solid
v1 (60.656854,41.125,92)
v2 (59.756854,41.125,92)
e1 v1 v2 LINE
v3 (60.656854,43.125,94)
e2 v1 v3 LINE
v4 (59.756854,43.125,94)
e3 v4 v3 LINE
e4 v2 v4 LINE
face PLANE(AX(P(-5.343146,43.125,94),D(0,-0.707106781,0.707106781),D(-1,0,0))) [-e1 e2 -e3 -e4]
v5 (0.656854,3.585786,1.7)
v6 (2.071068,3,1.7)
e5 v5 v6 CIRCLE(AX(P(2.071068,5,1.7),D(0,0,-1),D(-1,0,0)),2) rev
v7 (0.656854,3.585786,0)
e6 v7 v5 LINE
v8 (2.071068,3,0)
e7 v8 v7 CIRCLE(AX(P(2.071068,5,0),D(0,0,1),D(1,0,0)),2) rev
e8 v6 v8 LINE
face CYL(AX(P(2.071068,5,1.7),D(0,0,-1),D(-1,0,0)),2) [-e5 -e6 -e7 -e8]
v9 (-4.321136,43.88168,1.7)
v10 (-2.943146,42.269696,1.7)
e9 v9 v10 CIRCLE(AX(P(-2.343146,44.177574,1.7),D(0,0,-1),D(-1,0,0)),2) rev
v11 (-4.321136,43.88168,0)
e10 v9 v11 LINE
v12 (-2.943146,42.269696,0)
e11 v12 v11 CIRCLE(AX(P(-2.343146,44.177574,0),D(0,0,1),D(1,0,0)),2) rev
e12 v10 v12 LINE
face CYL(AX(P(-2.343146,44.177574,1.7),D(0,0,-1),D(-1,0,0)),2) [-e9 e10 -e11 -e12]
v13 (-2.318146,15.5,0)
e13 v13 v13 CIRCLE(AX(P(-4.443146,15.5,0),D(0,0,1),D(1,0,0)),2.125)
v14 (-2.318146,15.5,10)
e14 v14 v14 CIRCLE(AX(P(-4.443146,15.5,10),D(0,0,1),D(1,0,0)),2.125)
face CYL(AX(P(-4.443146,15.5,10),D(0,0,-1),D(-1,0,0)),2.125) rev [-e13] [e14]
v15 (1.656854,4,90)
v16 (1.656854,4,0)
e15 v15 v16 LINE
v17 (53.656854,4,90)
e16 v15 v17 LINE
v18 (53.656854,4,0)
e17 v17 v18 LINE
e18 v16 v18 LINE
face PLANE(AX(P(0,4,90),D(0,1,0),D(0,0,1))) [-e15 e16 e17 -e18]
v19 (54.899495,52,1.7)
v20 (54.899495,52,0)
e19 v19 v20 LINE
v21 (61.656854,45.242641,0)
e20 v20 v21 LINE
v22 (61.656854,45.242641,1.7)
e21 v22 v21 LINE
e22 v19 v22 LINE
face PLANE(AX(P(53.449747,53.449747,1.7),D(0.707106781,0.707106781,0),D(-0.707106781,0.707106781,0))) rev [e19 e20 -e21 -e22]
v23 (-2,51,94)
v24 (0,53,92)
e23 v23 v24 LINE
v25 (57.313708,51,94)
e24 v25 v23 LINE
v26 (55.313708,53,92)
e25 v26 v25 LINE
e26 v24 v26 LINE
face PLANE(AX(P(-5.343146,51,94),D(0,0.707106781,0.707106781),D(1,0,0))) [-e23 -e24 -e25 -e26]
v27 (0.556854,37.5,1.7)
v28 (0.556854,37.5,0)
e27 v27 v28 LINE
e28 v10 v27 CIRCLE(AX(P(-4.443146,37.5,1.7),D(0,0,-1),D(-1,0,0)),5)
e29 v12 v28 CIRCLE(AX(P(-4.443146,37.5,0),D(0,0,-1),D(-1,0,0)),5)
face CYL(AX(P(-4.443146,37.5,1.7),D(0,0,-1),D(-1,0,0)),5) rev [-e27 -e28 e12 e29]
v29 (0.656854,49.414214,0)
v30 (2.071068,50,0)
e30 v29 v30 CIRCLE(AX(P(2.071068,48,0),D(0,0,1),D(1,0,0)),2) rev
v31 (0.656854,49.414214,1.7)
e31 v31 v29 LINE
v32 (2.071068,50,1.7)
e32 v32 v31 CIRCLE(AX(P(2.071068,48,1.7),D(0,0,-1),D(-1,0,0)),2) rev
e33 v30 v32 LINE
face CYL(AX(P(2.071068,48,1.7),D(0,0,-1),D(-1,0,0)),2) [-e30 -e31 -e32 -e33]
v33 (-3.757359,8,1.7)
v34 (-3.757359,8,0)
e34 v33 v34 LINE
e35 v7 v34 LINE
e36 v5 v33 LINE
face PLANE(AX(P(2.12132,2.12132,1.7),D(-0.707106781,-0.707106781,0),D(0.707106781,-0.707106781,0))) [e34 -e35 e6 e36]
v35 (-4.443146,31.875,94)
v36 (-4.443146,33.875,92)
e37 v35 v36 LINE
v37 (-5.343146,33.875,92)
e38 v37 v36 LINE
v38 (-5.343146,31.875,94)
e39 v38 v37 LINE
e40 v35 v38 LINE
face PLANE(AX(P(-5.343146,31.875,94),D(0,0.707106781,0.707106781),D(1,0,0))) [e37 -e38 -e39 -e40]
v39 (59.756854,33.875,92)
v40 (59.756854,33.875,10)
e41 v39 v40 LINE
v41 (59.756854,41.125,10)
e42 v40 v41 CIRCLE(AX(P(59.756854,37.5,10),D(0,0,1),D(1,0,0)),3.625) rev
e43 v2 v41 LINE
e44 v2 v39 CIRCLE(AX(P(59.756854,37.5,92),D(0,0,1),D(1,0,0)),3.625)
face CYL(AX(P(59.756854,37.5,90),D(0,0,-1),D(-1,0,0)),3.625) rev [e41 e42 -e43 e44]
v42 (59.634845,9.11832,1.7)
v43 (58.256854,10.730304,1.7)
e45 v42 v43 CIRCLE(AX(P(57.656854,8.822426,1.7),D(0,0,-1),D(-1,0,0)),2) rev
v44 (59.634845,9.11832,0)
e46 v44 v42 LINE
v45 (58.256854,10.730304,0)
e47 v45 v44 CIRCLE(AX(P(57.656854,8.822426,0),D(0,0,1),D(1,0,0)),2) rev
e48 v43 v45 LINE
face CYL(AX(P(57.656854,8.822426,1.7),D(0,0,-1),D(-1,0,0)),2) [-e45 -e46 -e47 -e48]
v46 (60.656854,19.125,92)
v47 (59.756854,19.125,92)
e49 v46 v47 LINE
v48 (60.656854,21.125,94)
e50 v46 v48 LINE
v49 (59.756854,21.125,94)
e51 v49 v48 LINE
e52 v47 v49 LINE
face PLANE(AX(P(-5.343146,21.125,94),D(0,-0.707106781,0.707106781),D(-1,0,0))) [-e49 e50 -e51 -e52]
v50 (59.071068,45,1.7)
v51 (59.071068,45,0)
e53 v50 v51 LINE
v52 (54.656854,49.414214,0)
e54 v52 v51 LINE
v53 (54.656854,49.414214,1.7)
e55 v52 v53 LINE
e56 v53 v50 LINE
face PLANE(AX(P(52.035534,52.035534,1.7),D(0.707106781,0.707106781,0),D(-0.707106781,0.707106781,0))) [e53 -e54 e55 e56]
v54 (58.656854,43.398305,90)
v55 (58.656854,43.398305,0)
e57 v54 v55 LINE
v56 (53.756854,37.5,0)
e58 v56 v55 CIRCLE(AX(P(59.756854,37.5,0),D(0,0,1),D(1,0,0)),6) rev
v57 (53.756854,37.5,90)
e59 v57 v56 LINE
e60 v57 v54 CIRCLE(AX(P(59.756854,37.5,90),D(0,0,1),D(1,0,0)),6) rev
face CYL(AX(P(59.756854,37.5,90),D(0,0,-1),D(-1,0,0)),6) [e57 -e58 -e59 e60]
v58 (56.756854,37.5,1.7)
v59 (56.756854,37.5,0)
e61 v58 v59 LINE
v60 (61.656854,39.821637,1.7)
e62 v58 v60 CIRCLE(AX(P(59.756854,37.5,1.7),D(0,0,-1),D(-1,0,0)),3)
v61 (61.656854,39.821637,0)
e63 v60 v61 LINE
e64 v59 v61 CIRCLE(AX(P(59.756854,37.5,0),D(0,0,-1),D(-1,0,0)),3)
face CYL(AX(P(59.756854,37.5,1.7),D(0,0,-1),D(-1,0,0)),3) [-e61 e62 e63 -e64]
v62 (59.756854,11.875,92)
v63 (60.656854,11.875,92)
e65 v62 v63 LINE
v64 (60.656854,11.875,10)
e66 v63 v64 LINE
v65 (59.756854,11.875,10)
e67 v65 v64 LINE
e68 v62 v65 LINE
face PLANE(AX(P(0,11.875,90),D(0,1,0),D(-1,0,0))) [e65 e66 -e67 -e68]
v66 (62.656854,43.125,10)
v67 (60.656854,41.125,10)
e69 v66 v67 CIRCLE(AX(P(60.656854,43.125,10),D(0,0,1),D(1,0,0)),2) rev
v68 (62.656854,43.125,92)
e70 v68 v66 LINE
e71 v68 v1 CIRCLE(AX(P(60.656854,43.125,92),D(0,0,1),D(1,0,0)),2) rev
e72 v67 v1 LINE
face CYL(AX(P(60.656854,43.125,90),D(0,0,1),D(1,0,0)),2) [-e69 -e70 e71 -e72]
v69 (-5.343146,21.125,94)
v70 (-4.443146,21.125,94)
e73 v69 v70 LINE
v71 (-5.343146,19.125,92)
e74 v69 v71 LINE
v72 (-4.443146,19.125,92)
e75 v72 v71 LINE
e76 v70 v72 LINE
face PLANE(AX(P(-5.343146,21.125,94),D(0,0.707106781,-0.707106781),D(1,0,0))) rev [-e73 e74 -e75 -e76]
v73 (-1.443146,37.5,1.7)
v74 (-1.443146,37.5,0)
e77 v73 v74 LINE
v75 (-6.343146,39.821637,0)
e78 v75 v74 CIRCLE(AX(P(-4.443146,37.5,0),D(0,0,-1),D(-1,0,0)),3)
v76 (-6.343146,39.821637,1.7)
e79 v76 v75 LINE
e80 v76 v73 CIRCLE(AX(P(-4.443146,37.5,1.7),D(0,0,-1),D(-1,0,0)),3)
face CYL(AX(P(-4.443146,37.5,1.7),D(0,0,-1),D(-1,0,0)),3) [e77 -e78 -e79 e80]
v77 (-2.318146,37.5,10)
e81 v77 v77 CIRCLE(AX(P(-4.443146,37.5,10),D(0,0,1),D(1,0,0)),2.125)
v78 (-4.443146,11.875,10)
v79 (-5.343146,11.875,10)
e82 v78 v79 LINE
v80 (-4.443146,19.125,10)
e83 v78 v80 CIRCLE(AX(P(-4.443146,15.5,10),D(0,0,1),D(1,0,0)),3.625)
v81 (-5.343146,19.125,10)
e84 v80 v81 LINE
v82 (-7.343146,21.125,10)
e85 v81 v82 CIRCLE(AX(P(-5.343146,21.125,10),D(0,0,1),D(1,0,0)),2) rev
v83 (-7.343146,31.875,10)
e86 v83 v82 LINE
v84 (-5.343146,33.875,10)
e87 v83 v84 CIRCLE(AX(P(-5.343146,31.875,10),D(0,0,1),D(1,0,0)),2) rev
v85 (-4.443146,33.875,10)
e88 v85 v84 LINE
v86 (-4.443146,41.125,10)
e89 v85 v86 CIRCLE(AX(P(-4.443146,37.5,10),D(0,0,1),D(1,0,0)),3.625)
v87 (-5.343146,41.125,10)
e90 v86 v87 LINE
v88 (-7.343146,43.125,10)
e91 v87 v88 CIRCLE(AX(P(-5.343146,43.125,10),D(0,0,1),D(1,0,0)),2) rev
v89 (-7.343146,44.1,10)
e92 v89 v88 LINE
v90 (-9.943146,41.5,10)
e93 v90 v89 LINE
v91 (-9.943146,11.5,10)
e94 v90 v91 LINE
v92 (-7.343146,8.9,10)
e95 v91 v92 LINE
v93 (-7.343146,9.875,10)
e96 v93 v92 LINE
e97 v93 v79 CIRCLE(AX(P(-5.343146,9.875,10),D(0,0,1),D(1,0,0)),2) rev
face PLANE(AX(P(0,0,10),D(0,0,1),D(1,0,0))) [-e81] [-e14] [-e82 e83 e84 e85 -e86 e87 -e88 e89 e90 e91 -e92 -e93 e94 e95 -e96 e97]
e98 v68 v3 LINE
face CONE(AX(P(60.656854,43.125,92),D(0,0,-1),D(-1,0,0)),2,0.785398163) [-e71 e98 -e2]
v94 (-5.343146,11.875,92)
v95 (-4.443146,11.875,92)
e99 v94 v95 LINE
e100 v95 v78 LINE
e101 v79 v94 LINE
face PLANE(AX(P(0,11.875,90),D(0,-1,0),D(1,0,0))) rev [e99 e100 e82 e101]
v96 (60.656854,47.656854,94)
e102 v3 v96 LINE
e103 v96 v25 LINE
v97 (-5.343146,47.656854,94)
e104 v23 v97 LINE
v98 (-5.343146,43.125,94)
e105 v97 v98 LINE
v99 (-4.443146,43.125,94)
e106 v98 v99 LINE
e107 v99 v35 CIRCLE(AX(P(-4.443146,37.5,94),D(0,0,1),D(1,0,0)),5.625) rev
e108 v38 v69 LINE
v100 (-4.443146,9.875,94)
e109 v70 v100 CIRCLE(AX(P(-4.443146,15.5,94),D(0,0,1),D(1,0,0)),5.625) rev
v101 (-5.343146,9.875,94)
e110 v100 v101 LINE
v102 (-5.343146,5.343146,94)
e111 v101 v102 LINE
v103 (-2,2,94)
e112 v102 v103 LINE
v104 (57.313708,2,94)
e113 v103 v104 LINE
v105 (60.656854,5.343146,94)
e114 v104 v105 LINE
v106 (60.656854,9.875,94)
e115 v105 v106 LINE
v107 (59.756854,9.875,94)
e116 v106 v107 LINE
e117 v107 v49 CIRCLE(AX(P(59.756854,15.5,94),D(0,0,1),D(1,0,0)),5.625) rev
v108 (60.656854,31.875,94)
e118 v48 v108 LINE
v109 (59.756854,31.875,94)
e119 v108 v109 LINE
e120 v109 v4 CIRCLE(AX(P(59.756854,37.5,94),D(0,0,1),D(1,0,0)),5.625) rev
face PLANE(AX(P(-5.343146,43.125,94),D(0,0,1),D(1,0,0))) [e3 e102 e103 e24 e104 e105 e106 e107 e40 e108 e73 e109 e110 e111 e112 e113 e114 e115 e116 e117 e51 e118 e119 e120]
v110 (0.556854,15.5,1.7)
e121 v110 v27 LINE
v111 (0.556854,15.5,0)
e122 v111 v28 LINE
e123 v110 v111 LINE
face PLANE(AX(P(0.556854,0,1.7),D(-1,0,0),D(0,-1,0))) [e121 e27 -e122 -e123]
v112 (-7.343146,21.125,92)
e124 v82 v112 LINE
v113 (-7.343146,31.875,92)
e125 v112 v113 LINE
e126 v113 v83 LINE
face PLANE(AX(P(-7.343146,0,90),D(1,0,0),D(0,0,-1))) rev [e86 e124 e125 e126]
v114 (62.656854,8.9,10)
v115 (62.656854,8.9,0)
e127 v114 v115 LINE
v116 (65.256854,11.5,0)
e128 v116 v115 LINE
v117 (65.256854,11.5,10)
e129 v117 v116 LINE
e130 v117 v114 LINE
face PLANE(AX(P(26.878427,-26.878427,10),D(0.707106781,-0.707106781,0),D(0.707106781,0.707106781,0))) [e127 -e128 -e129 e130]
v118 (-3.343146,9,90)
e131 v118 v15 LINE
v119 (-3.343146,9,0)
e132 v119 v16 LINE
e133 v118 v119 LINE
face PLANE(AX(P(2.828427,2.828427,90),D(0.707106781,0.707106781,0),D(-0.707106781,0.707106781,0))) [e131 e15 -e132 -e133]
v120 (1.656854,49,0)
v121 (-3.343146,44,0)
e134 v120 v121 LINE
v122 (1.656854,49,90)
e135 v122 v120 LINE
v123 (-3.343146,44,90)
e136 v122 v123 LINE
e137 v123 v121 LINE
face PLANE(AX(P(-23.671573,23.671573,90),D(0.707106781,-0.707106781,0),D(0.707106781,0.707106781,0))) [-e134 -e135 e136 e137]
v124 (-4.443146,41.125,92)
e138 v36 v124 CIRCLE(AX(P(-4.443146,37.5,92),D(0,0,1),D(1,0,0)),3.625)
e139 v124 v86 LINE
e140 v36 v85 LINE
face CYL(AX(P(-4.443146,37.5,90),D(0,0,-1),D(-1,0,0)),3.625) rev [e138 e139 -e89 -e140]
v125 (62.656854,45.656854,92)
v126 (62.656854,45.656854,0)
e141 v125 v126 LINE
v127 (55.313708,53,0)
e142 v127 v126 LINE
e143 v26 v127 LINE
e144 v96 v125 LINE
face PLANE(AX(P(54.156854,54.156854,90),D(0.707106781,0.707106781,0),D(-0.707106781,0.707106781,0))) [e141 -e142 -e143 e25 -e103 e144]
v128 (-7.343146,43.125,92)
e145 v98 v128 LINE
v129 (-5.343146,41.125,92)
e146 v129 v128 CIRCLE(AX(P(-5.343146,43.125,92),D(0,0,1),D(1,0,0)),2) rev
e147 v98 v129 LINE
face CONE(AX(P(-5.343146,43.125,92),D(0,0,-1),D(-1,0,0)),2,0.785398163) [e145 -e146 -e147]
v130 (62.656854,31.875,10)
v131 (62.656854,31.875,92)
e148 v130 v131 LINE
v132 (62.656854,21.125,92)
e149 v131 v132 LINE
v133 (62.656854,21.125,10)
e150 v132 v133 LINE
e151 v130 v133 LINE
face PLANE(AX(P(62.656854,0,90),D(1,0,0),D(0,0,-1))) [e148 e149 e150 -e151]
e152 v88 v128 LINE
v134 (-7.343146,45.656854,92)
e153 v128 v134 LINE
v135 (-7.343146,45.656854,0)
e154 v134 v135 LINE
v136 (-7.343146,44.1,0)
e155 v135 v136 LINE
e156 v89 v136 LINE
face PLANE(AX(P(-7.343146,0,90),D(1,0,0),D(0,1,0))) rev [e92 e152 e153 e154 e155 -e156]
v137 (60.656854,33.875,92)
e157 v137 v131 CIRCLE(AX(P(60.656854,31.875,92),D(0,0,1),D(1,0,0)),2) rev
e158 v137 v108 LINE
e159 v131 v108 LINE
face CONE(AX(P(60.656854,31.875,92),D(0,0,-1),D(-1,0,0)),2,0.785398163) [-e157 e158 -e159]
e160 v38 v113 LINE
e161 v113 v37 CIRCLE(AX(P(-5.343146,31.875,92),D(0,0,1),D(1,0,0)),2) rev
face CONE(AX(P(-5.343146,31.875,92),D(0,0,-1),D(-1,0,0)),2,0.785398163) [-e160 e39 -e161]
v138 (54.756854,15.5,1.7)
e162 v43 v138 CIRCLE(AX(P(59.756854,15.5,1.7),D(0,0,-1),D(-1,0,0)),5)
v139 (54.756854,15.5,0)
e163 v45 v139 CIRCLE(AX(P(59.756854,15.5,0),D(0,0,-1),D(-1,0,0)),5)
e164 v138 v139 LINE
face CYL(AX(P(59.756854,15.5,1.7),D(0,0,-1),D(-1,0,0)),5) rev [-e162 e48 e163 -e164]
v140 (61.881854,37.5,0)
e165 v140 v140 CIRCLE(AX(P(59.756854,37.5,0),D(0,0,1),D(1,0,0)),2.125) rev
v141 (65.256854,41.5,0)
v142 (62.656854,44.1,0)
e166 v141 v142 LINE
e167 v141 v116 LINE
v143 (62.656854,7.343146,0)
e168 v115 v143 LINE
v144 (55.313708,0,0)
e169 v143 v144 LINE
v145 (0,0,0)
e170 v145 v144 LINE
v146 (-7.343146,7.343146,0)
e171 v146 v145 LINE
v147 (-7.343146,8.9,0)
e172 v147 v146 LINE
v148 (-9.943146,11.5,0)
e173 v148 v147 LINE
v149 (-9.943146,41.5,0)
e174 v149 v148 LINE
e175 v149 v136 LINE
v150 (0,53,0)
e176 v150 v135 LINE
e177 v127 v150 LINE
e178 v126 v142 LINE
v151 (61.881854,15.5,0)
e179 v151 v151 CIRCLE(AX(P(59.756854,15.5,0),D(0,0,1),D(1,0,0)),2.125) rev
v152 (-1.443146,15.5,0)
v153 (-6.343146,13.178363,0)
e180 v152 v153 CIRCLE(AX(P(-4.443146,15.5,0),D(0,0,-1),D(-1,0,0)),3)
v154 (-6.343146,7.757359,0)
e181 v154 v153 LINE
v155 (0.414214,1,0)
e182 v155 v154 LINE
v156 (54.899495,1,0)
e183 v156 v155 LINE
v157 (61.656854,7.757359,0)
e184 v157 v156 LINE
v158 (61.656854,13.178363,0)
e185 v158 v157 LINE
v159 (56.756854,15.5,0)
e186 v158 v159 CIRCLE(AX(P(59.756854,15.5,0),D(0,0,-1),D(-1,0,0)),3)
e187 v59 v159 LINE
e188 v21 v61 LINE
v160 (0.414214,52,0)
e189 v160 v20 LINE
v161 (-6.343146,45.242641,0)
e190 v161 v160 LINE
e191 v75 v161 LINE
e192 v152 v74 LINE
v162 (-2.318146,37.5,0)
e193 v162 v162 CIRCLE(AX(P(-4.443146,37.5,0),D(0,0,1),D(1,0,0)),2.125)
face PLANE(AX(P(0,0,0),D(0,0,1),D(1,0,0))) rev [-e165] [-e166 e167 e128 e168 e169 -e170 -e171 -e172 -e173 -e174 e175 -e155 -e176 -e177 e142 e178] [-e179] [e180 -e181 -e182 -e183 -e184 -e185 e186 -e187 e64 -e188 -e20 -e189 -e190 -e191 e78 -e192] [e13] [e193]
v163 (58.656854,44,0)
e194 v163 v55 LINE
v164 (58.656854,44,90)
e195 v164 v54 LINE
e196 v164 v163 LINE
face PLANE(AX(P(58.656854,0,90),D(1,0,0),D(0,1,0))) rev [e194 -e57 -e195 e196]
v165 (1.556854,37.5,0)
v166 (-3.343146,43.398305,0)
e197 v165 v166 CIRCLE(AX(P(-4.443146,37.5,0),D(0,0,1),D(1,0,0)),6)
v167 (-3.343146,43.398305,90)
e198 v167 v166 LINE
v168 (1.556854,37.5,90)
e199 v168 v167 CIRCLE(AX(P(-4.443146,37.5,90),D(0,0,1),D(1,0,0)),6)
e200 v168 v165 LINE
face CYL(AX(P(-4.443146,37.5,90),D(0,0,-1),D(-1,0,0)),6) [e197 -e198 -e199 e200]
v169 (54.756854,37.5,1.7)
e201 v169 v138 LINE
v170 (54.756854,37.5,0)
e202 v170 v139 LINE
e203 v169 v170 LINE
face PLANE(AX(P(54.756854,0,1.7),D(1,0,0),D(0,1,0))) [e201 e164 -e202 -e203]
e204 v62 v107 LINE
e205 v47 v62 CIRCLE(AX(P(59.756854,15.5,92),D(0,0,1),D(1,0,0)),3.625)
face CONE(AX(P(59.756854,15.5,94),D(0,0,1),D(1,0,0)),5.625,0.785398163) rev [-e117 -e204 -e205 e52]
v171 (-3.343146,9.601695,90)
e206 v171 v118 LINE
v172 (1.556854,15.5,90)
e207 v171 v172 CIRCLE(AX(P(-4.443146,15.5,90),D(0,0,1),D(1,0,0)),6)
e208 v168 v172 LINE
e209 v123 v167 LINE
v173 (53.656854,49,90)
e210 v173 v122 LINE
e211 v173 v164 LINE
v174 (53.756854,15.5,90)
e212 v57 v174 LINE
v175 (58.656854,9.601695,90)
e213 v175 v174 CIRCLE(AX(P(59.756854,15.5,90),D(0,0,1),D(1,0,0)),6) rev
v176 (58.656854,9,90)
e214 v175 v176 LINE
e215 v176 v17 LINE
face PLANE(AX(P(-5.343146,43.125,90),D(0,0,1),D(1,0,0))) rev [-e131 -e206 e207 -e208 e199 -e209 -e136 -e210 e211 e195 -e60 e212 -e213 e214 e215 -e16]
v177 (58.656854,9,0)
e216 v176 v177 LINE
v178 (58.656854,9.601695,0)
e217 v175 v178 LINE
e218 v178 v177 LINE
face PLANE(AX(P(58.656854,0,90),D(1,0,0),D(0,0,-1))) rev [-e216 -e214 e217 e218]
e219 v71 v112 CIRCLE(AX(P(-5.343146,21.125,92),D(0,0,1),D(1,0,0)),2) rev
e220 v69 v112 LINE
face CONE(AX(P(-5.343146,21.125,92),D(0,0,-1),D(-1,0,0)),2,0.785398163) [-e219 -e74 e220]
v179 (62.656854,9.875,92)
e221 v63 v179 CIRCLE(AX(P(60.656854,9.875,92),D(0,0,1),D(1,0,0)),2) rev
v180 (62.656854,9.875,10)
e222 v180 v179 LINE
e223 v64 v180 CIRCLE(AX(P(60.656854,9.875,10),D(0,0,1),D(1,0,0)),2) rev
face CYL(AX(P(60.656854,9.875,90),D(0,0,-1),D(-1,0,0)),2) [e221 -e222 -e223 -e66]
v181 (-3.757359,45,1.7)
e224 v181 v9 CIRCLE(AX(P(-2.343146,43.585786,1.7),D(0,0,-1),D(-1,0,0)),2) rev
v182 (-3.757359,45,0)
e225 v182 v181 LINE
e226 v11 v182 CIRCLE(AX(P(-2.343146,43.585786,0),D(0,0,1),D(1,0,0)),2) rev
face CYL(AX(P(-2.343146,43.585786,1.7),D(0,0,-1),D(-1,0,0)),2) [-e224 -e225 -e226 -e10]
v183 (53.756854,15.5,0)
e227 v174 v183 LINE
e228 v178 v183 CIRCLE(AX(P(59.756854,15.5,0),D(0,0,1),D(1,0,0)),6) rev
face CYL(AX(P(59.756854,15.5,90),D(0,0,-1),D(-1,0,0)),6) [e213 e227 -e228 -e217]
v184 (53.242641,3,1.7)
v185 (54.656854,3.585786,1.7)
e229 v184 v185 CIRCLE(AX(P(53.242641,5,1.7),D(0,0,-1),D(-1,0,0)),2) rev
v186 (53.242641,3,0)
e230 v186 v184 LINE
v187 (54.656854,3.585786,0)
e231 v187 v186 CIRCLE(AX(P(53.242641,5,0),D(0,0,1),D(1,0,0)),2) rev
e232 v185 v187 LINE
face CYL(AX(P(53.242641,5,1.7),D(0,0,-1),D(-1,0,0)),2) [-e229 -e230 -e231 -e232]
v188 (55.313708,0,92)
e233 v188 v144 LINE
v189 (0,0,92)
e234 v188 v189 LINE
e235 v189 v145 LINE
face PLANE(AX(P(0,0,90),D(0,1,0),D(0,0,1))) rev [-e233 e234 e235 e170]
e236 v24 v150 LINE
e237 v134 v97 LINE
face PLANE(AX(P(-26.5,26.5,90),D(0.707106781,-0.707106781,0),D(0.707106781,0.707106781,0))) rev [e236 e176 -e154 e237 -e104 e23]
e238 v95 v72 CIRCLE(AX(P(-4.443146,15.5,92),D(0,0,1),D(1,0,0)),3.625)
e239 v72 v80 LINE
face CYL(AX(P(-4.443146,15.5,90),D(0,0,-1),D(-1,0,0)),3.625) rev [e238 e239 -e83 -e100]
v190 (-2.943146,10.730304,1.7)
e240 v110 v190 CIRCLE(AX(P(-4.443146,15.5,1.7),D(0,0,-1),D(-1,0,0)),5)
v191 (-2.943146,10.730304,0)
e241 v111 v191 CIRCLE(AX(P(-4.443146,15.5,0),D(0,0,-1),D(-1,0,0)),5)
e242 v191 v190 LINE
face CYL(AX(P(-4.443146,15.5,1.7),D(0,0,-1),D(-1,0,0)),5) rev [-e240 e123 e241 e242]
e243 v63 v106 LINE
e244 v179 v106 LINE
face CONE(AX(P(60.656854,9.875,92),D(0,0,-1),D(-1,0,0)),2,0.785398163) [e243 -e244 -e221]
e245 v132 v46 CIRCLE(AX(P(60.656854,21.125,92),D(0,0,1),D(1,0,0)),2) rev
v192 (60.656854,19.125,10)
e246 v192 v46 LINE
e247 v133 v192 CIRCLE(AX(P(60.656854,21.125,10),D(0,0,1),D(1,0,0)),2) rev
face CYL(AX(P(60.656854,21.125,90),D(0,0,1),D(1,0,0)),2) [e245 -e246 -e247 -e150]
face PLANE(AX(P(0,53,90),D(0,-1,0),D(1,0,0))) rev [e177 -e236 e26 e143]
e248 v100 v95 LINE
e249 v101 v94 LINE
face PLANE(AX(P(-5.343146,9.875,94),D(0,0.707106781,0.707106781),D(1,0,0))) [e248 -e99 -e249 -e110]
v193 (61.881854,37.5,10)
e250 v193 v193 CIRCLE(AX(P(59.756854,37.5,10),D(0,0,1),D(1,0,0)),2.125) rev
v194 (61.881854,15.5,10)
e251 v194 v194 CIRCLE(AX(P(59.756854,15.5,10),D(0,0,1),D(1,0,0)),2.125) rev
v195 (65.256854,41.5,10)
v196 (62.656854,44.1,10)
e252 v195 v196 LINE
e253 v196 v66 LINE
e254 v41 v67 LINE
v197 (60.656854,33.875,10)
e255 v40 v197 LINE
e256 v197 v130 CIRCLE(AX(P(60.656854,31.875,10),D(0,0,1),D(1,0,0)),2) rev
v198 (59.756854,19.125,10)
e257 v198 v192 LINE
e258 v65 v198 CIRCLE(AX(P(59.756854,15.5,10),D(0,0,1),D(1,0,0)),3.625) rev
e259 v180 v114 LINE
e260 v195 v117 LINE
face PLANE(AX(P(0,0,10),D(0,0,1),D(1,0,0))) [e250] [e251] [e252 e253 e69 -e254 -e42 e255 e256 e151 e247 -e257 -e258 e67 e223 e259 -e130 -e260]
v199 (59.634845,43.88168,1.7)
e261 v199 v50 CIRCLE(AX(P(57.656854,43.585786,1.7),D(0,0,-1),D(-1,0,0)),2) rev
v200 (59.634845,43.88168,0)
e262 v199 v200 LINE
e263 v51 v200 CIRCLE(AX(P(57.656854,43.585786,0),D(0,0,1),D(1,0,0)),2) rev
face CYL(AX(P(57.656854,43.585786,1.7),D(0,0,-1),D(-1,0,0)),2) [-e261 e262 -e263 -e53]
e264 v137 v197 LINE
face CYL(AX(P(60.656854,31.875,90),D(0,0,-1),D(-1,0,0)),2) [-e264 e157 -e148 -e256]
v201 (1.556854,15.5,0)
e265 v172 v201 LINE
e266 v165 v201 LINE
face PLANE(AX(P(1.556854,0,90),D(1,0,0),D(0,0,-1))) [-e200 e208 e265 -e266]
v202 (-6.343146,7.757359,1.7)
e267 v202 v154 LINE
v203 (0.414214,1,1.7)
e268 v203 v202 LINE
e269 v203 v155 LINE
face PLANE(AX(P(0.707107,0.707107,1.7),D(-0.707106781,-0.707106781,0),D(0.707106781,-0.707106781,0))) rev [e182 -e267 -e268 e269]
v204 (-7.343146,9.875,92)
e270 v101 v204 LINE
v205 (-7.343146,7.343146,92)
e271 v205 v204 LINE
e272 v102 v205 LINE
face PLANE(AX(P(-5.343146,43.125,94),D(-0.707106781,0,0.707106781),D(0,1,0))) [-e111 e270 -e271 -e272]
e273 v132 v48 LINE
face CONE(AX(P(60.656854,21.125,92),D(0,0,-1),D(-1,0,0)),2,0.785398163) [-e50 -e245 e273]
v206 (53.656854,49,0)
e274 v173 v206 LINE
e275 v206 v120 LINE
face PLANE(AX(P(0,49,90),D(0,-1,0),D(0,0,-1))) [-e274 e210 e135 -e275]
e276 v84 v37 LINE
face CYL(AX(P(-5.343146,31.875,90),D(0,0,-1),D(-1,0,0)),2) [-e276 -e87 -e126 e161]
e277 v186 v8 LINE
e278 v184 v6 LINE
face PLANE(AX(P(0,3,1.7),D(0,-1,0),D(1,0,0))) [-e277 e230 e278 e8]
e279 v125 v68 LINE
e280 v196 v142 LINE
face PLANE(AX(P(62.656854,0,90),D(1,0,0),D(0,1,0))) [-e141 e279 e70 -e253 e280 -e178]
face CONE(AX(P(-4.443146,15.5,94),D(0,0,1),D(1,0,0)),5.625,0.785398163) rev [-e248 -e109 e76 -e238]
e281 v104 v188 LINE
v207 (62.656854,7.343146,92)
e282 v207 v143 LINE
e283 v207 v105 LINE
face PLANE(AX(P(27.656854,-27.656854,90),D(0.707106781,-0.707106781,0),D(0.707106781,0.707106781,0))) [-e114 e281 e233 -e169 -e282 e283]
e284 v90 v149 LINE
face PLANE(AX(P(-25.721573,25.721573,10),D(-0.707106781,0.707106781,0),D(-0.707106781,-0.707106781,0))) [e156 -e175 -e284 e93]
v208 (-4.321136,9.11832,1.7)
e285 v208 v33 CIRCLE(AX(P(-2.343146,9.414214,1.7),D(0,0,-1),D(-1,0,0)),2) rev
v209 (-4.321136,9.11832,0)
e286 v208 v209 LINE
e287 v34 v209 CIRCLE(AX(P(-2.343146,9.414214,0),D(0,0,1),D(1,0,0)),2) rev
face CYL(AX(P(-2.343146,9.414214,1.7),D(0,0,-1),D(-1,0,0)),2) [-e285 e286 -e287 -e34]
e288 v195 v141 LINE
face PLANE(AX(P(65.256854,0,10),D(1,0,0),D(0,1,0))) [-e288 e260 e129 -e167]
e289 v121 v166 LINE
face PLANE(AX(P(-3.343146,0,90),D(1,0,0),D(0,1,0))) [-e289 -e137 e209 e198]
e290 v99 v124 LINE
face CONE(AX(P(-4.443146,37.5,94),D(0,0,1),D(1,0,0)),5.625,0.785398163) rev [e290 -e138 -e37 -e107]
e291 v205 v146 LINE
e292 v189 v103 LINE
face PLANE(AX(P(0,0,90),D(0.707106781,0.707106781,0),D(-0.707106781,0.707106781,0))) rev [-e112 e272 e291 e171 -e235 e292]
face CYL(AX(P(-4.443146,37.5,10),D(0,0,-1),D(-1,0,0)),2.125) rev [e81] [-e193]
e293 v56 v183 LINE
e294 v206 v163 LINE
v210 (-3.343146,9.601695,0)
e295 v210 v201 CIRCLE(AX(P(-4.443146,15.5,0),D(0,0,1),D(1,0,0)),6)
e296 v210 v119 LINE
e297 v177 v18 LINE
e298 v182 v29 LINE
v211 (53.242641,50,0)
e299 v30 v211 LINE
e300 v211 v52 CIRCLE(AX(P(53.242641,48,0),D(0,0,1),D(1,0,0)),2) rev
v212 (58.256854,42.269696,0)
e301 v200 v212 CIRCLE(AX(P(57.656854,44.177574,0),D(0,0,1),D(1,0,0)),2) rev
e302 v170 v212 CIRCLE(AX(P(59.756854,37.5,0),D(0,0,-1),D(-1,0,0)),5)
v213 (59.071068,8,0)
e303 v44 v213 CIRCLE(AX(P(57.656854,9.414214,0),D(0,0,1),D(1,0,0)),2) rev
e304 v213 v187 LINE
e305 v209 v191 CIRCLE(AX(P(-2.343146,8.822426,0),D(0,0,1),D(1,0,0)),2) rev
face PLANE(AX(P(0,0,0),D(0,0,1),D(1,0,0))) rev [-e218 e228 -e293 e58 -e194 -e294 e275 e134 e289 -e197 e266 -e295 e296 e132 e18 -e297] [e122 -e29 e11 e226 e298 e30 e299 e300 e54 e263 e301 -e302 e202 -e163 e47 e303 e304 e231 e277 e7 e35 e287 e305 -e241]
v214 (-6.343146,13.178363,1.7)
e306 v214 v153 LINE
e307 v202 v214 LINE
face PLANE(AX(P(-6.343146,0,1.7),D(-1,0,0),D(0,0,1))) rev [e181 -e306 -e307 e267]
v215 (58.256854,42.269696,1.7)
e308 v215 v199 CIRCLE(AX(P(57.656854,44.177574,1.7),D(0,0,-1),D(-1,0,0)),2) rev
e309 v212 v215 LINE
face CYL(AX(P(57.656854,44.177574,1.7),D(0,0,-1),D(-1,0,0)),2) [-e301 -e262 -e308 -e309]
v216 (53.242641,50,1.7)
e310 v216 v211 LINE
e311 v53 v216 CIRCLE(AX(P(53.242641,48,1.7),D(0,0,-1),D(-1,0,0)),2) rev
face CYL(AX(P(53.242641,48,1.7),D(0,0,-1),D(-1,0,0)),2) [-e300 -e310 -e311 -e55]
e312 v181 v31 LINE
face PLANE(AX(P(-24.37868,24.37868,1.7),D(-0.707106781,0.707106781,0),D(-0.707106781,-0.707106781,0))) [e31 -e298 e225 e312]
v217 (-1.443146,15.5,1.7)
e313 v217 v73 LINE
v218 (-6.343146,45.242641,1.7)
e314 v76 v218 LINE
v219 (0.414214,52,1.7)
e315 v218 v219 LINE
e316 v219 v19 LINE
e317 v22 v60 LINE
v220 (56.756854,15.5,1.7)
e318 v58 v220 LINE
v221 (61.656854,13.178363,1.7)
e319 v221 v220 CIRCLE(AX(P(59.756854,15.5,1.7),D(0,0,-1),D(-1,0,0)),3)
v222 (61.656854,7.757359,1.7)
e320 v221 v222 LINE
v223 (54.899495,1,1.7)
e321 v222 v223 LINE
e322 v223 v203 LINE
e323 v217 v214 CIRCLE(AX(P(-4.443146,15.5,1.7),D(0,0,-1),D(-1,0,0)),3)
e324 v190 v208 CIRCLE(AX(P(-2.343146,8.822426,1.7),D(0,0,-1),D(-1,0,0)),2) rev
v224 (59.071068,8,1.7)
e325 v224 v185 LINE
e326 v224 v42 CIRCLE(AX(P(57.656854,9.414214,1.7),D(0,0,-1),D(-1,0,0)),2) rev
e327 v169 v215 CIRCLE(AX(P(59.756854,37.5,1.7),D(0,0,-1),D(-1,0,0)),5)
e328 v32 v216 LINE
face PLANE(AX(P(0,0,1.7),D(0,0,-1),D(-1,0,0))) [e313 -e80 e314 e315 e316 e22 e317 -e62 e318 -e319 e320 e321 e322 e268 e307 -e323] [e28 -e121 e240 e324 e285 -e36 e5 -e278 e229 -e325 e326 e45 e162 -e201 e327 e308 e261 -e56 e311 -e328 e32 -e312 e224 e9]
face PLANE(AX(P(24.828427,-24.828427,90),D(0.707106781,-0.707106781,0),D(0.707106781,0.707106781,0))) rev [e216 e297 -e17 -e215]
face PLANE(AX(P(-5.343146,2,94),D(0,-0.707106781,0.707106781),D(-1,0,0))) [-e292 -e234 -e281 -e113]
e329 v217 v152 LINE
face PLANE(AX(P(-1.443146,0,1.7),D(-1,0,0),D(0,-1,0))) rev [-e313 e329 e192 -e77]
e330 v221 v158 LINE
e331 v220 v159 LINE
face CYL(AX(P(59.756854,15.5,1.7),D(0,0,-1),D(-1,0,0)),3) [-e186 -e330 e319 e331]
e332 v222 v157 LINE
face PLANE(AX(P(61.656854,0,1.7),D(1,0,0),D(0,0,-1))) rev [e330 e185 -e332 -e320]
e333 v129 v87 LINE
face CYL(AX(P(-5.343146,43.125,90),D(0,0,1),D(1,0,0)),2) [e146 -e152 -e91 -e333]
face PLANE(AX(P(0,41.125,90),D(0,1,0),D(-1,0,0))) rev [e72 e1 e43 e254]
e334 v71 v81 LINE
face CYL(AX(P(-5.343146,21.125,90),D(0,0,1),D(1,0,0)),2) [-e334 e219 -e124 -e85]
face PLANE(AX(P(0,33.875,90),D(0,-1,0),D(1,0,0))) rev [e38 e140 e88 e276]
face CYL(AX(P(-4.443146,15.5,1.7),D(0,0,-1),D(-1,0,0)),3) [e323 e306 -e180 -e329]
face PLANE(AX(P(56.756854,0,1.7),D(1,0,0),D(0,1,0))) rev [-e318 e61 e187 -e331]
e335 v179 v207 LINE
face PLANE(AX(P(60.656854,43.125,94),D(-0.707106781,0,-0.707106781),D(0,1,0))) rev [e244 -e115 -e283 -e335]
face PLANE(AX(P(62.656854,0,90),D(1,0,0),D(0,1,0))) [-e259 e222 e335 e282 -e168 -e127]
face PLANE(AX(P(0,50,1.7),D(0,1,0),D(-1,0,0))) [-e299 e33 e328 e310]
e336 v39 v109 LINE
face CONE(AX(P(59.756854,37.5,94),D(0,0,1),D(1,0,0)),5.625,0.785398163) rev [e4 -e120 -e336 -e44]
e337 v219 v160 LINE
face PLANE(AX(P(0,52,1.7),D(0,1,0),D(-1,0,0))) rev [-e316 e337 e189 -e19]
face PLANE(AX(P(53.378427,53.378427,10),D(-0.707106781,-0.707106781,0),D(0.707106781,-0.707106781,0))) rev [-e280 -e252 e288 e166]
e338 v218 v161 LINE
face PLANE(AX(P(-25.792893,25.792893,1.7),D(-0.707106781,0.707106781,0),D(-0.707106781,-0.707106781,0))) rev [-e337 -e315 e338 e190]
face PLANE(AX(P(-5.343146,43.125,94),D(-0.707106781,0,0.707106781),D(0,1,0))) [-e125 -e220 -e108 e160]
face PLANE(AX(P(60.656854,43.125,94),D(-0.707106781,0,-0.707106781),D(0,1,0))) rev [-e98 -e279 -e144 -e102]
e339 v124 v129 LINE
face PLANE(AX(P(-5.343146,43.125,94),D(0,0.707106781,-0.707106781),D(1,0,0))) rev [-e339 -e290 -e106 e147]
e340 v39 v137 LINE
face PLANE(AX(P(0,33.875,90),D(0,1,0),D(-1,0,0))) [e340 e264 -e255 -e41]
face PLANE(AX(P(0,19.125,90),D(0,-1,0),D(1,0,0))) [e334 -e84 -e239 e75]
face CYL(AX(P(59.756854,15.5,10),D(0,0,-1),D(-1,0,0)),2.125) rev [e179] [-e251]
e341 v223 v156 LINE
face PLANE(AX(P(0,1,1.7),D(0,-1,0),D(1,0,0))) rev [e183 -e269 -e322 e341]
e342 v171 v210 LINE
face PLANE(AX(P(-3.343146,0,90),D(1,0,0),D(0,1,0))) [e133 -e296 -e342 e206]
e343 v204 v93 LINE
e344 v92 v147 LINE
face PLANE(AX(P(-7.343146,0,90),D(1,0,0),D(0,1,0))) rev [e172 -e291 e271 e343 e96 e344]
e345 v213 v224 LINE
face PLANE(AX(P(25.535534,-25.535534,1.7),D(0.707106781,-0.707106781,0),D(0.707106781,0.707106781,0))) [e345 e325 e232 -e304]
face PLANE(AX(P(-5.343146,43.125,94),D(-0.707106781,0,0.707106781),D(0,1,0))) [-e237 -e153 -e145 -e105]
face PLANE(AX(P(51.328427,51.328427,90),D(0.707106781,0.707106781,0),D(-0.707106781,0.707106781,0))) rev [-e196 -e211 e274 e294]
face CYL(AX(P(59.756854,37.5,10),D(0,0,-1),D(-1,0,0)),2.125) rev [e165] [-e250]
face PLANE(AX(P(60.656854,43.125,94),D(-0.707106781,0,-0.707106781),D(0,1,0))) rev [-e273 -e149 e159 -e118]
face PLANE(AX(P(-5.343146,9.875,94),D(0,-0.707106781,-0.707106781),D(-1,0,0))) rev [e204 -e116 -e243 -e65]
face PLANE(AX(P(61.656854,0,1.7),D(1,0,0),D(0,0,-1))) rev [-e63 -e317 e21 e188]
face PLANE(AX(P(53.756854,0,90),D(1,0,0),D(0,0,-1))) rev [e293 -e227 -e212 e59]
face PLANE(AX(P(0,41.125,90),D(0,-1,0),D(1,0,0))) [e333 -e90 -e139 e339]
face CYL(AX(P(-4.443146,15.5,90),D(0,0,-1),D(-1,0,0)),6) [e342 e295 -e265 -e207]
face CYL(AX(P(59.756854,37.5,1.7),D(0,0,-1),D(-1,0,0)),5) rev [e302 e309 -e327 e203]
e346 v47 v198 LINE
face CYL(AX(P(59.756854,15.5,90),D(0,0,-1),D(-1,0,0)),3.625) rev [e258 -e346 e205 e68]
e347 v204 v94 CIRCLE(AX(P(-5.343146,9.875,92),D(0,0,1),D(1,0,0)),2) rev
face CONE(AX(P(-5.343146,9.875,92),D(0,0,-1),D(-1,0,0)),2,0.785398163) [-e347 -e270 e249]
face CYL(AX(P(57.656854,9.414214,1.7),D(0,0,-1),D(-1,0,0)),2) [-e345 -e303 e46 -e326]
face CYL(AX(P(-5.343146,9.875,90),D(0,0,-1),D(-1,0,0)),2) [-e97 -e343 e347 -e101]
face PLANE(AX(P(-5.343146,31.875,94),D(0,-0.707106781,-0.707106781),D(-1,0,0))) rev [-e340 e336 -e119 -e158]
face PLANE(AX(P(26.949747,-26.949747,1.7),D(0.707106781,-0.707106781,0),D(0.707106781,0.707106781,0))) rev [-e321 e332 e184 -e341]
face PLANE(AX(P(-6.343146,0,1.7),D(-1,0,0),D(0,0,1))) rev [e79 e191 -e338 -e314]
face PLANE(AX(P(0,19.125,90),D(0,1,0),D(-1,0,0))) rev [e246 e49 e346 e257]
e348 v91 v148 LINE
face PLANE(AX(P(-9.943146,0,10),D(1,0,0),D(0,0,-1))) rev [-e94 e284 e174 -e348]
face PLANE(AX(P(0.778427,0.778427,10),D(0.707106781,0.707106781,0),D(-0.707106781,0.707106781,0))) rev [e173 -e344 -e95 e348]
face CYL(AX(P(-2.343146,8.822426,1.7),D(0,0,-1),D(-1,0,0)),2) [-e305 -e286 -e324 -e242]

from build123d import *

# Parameters (mm, degrees)
BOSS_EXTRUDE1_DEPTH = 90
SKETCH1_3_R         = 2.125
BOSS_EXTRUDE2_DEPTH = 10
FILLET1_R           = 2
BOSS_EXTRUDE3_START = 4
BOSS_EXTRUDE3_DEPTH = 4
CHAMFER1_SIZE       = 2
CUT_EXTRUDE1_DEPTH  = 1.7
FILLET2_R           = 2


# Some blends are built 0.0001 mm under size
with BuildPart() as part:
    # Sketch1 → Boss-Extrude1 (new body)
    with BuildSketch(Plane.XY):
        with BuildLine():
            Line((55.313708499, 53), (0, 53))
            Line((0, 53), (-7.343145751, 45.656854249))
            Line((-7.343145751, 45.656854249), (-7.343145751, 41.125))
            Line((-7.343145751, 41.125), (-4.443145751, 41.125))
            ThreePointArc((-4.443145751, 41.125), (-0.818145751, 37.5), (-4.443145751, 33.875))
            Line((-4.443145751, 33.875), (-7.343145751, 33.875))
            Line((-7.343145751, 33.875), (-7.343145751, 19.125))
            Line((-7.343145751, 19.125), (-4.443145751, 19.125))
            ThreePointArc((-4.443145751, 19.125), (-0.818145751, 15.5), (-4.443145751, 11.875))
            Line((-4.443145751, 11.875), (-7.343145751, 11.875))
            Line((-7.343145751, 11.875), (-7.343145751, 7.343145751))
            Line((-7.343145751, 7.343145751), (0, 0))
            Line((0, 0), (55.313708499, 0))
            Line((55.313708499, 0), (62.656854249, 7.343145751))
            Line((62.656854249, 7.343145751), (62.656854249, 11.875))
            Line((62.656854249, 11.875), (59.756854249, 11.875))
            ThreePointArc((59.756854249, 11.875), (56.131854249, 15.5), (59.756854249, 19.125))
            Line((59.756854249, 19.125), (62.656854249, 19.125))
            Line((62.656854249, 19.125), (62.656854249, 33.875))
            Line((62.656854249, 33.875), (59.756854249, 33.875))
            ThreePointArc((59.756854249, 33.875), (56.131854249, 37.5), (59.756854249, 41.125))
            Line((59.756854249, 41.125), (62.656854249, 41.125))
            Line((62.656854249, 41.125), (62.656854249, 45.656854249))
            Line((62.656854249, 45.656854249), (55.313708499, 53))
        make_face()
        with BuildLine():
            Line((53.656854249, 4), (1.656854249, 4))
            Line((1.656854249, 4), (-3.343145751, 9))
            Line((-3.343145751, 9), (-3.343145751, 9.601695159))
            ThreePointArc((-3.343145751, 9.601695159), (0.172046553, 11.665942097), (1.556854249, 15.5))
            Line((1.556854249, 15.5), (1.556854249, 37.5))
            ThreePointArc((1.556854249, 37.5), (0.172046553, 41.334057903), (-3.343145751, 43.398304841))
            Line((-3.343145751, 43.398304841), (-3.343145751, 44))
            Line((-3.343145751, 44), (1.656854249, 49))
            Line((1.656854249, 49), (53.656854249, 49))
            Line((53.656854249, 49), (58.656854249, 44))
            Line((58.656854249, 44), (58.656854249, 43.398304841))
            ThreePointArc((58.656854249, 43.398304841), (55.141661946, 41.334057903), (53.756854249, 37.5))
            Line((53.756854249, 37.5), (53.756854249, 15.5))
            ThreePointArc((53.756854249, 15.5), (55.141661946, 11.665942097), (58.656854249, 9.601695159))
            Line((58.656854249, 9.601695159), (58.656854249, 9))
            Line((58.656854249, 9), (53.656854249, 4))
        make_face(mode=Mode.SUBTRACT)
    extrude(amount=BOSS_EXTRUDE1_DEPTH)

    # Sketch1<3> → Boss-Extrude2 (add)
    # profile 1 of 2: a face of its own
    with BuildSketch(Plane.XY):
        with BuildLine():
            ThreePointArc((-4.443145751, 33.875), (-0.818145751, 37.5), (-4.443145751, 41.125))
            Line((-4.443145751, 41.125), (-7.343145751, 41.125))
            Line((-7.343145751, 41.125), (-7.343145751, 44.1))
            Line((-7.343145751, 44.1), (-9.943145751, 41.5))
            Line((-9.943145751, 41.5), (-9.943145751, 11.5))
            Line((-9.943145751, 11.5), (-7.343145751, 8.9))
            Line((-7.343145751, 8.9), (-7.343145751, 11.875))
            Line((-7.343145751, 11.875), (-4.443145751, 11.875))
            ThreePointArc((-4.443145751, 11.875), (-0.818145751, 15.5), (-4.443145751, 19.125))
            Line((-4.443145751, 19.125), (-7.343145751, 19.125))
            Line((-7.343145751, 19.125), (-7.343145751, 33.875))
            Line((-7.343145751, 33.875), (-4.443145751, 33.875))
        make_face()
        with Locations((-4.443145751, 15.5)):
            Circle(SKETCH1_3_R, mode=Mode.SUBTRACT)
        with Locations((-4.443145751, 37.5)):
            Circle(SKETCH1_3_R, mode=Mode.SUBTRACT)
    # profile 2 of 2: a face of its own
    with BuildSketch(Plane.XY):
        with BuildLine():
            Line((65.256854249, 41.5), (62.656854249, 44.1))
            Line((62.656854249, 44.1), (62.656854249, 41.125))
            Line((62.656854249, 41.125), (59.756854249, 41.125))
            ThreePointArc((59.756854249, 41.125), (56.131854249, 37.5), (59.756854249, 33.875))
            Line((59.756854249, 33.875), (62.656854249, 33.875))
            Line((62.656854249, 33.875), (62.656854249, 19.125))
            Line((62.656854249, 19.125), (59.756854249, 19.125))
            ThreePointArc((59.756854249, 19.125), (56.131854249, 15.5), (59.756854249, 11.875))
            Line((59.756854249, 11.875), (62.656854249, 11.875))
            Line((62.656854249, 11.875), (62.656854249, 8.9))
            Line((62.656854249, 8.9), (65.256854249, 11.5))
            Line((65.256854249, 11.5), (65.256854249, 41.5))
        make_face()
        with Locations((59.756854249, 37.5)):
            Circle(SKETCH1_3_R, mode=Mode.SUBTRACT)
        with Locations((59.756854249, 15.5)):
            Circle(SKETCH1_3_R, mode=Mode.SUBTRACT)
    extrude(amount=BOSS_EXTRUDE2_DEPTH)

    # Fillet1
    fillet1_edges = [part.edges().sort_by_distance(p)[0] for p in [
        (62.656854249, 41.125, 50),
        (62.656854249, 33.875, 50),
        (62.656854249, 19.125, 50),
        (62.656854249, 11.875, 50),
        (-7.343145751, 11.875, 50),
        (-7.343145751, 19.125, 50),
        (-7.343145751, 33.875, 50),
        (-7.343145751, 41.125, 50),
    ]]
    fillet(fillet1_edges, radius=FILLET1_R)

    # Sketch2 → Boss-Extrude3 (add)
    with BuildSketch(Plane.XY.offset(90).offset(BOSS_EXTRUDE3_START)):
        with BuildLine():
            Line((-7.343145751, 31.875), (-7.343145751, 21.125))
            ThreePointArc((-7.343145751, 21.125), (-6.757359313, 19.710786438), (-5.343145751, 19.125))
            Line((-5.343145751, 19.125), (-4.443145751, 19.125))
            ThreePointArc((-4.443145751, 19.125), (-0.818145751, 15.5), (-4.443145751, 11.875))
            Line((-4.443145751, 11.875), (-5.343145751, 11.875))
            ThreePointArc((-5.343145751, 11.875), (-6.757359313, 11.289213562), (-7.343145751, 9.875))
            Line((-7.343145751, 9.875), (-7.343145751, 7.343145751))
            Line((-7.343145751, 7.343145751), (0, 0))
            Line((0, 0), (55.313708499, 0))
            Line((55.313708499, 0), (62.656854249, 7.343145751))
            Line((62.656854249, 7.343145751), (62.656854249, 9.875))
            ThreePointArc((62.656854249, 9.875), (62.071067812, 11.289213562), (60.656854249, 11.875))
            Line((60.656854249, 11.875), (59.756854249, 11.875))
            ThreePointArc((59.756854249, 11.875), (56.131854249, 15.5), (59.756854249, 19.125))
            Line((59.756854249, 19.125), (60.656854249, 19.125))
            ThreePointArc((60.656854249, 19.125), (62.071067812, 19.710786438), (62.656854249, 21.125))
            Line((62.656854249, 21.125), (62.656854249, 31.875))
            ThreePointArc((62.656854249, 31.875), (62.071067812, 33.289213562), (60.656854249, 33.875))
            Line((60.656854249, 33.875), (59.756854249, 33.875))
            ThreePointArc((59.756854249, 33.875), (56.131854249, 37.5), (59.756854249, 41.125))
            Line((59.756854249, 41.125), (60.656854249, 41.125))
            ThreePointArc((60.656854249, 41.125), (62.071067812, 41.710786438), (62.656854249, 43.125))
            Line((62.656854249, 43.125), (62.656854249, 45.656854249))
            Line((62.656854249, 45.656854249), (55.313708499, 53))
            Line((55.313708499, 53), (0, 53))
            Line((0, 53), (-7.343145751, 45.656854249))
            Line((-7.343145751, 45.656854249), (-7.343145751, 43.125))
            ThreePointArc((-7.343145751, 43.125), (-6.757359313, 41.710786438), (-5.343145751, 41.125))
            Line((-5.343145751, 41.125), (-4.443145751, 41.125))
            ThreePointArc((-4.443145751, 41.125), (-0.818145751, 37.5), (-4.443145751, 33.875))
            Line((-4.443145751, 33.875), (-5.343145751, 33.875))
            ThreePointArc((-5.343145751, 33.875), (-6.757359313, 33.289213562), (-7.343145751, 31.875))
        make_face()
    extrude(amount=-BOSS_EXTRUDE3_DEPTH)

    # Chamfer1
    chamfer1_edges = [part.edges().sort_by_distance(p)[0] for p in [
        (-7.343145751, 44.390927125, 94),
        (-6.757359313, 41.710786438, 94),
        (-4.893145751, 41.125, 94),
        (-0.818145751, 37.5, 94),
        (-4.893145751, 33.875, 94),
        (-6.757359313, 33.289213562, 94),
        (-7.343145751, 26.5, 94),
        (-6.757359313, 19.710786438, 94),
        (-4.893145751, 19.125, 94),
        (-0.818145751, 15.5, 94),
        (-4.893145751, 11.875, 94),
        (-6.757359313, 11.289213562, 94),
        (-7.343145751, 8.609072875, 94),
        (27.656854249, 0, 94),
        (62.656854249, 8.609072875, 94),
        (62.071067812, 11.289213562, 94),
        (60.206854249, 11.875, 94),
        (56.131854249, 15.5, 94),
        (60.206854249, 19.125, 94),
        (62.071067812, 19.710786438, 94),
        (62.656854249, 26.5, 94),
        (62.071067812, 33.289213562, 94),
        (60.206854249, 33.875, 94),
        (56.131854249, 37.5, 94),
        (60.206854249, 41.125, 94),
        (62.071067812, 41.710786438, 94),
        (62.656854249, 44.390927125, 94),
        (27.656854249, 53, 94),
    ]]
    chamfer(chamfer1_edges, length=CHAMFER1_SIZE - 0.0001)  # a hair under: the kernel refuses the full size

    # Sketch3 → Cut-Extrude1 (cut)
    with BuildSketch(Plane(origin=(0, 0, 0), x_dir=(-1, 0, 0), z_dir=(0, 0, -1))):
        with BuildLine():
            ThreePointArc((6.343145751, 39.821637353), (3.158622493, 40.211088342), (1.443145751, 37.5))
            Line((1.443145751, 37.5), (1.443145751, 15.5))
            ThreePointArc((1.443145751, 15.5), (3.158622493, 12.788911658), (6.343145751, 13.178362647))
            Line((6.343145751, 13.178362647), (6.343145751, 7.757359313))
            Line((6.343145751, 7.757359313), (-0.414213562, 1))
            Line((-0.414213562, 1), (-54.899494937, 1))
            Line((-54.899494937, 1), (-61.656854249, 7.757359313))
            Line((-61.656854249, 7.757359313), (-61.656854249, 13.178362647))
            ThreePointArc((-61.656854249, 13.178362647), (-58.472330992, 12.788911658), (-56.756854249, 15.5))
            Line((-56.756854249, 15.5), (-56.756854249, 37.5))
            ThreePointArc((-56.756854249, 37.5), (-58.472330992, 40.211088342), (-61.656854249, 39.821637353))
            Line((-61.656854249, 39.821637353), (-61.656854249, 45.242640687))
            Line((-61.656854249, 45.242640687), (-54.899494937, 52))
            Line((-54.899494937, 52), (-0.414213562, 52))
            Line((-0.414213562, 52), (6.343145751, 45.242640687))
            Line((6.343145751, 45.242640687), (6.343145751, 39.821637353))
        make_face()
        with BuildLine():
            Line((4.343145751, 42.4989999), (4.343145751, 44.414213562))
            Line((4.343145751, 44.414213562), (-1.242640687, 50))
            Line((-1.242640687, 50), (-54.071067812, 50))
            Line((-54.071067812, 50), (-59.656854249, 44.414213562))
            Line((-59.656854249, 44.414213562), (-59.656854249, 42.4989999))
            ThreePointArc((-59.656854249, 42.4989999), (-56.186140035, 41), (-54.756854249, 37.5))
            Line((-54.756854249, 37.5), (-54.756854249, 15.5))
            ThreePointArc((-54.756854249, 15.5), (-56.186140035, 12), (-59.656854249, 10.5010001))
            Line((-59.656854249, 10.5010001), (-59.656854249, 8.585786438))
            Line((-59.656854249, 8.585786438), (-54.071067812, 3))
            Line((-54.071067812, 3), (-1.242640687, 3))
            Line((-1.242640687, 3), (4.343145751, 8.585786438))
            Line((4.343145751, 8.585786438), (4.343145751, 10.5010001))
            ThreePointArc((4.343145751, 10.5010001), (0.872431536, 12), (-0.556854249, 15.5))
            Line((-0.556854249, 15.5), (-0.556854249, 37.5))
            ThreePointArc((-0.556854249, 37.5), (0.872431536, 41), (4.343145751, 42.4989999))
        make_face(mode=Mode.SUBTRACT)
    extrude(amount=-CUT_EXTRUDE1_DEPTH, mode=Mode.SUBTRACT)

    # Fillet2
    # the kernel refuses this fillet: 2 mm, written as the material it takes off along each edge
    with BuildSketch(Plane(origin=(1.242640687, 3, -2.071067812), x_dir=(1, 0, 0), z_dir=(0, 0, 1)), Plane(origin=(-4.343145751, 8.585786438, -2.071067812), x_dir=(0.7071067811865465, -0.7071067811865486, 0), z_dir=(0, 0, 1)), Plane(origin=(-4.343145751, 44.414213562, -2.071067812), x_dir=(0, -1, 0), z_dir=(0, 0, 1)), Plane(origin=(1.242640687, 50, -2.071067812), x_dir=(-0.7071067811865446, -0.7071067811865505, 0), z_dir=(0, 0, 1)), Plane(origin=(54.071067812, 50, -2.071067812), x_dir=(-1, 0, 0), z_dir=(0, 0, 1)), Plane(origin=(59.656854249, 44.414213562, -2.071067812), x_dir=(-0.7071067811865476, 0.7071067811865476, 0), z_dir=(0, 0, 1)), Plane(origin=(54.071067812, 3, -2.071067812), x_dir=(0.7071067811865448, 0.7071067811865502, 0), z_dir=(0, 0, 1)), Plane(origin=(59.656854249, 8.585786438, -2.071067812), x_dir=(0, 1, 0), z_dir=(0, 0, 1))) as fillet2_piece_1:
        with BuildLine():
            CenterArc((FILLET2_R * 0.414213562373, FILLET2_R), FILLET2_R, 225, 45)
            Line((-FILLET2_R * 0.292893218813, FILLET2_R * 0.292893218813), (0, 0))
            Line((0, 0), (FILLET2_R * 0.414213562373, 0))
        make_face()
    extrude(amount=3.771067812, mode=Mode.SUBTRACT)
    with BuildSketch(Plane(origin=(-4.343145751, 10.5010001, -4.196436275), x_dir=(0, -1, 0), z_dir=(0, 0, 1)), Plane(origin=(59.656854249, 42.4989999, -4.196436275), x_dir=(0, 1, 0), z_dir=(0, 0, 1))) as fillet2_piece_2:
        with BuildLine():
            CenterArc((1.67857451, 2), FILLET2_R, 197.457603124, 72.542396876)
            ThreePointArc((-0.229303893, 1.4), (-0.064746671, 0.70817391), (0, 0))
            Line((0, 0), (1.67857451, 0))
        make_face()
    extrude(amount=5.896436275, mode=Mode.SUBTRACT)
    with BuildSketch(Plane(origin=(-4.343145751, 42.4989999, -4.196436275), x_dir=(0.9868506458664519, -0.16163478200240997, 0), z_dir=(0, 0, 1)), Plane(origin=(59.656854249, 10.5010001, -4.196436275), x_dir=(-0.9868506458664523, 0.16163478200240763, 0), z_dir=(0, 0, 1))) as fillet2_piece_3:
        with BuildLine():
            CenterArc((1.702385267, 1.979771903), FILLET2_R, 189.301797561, 72.542396876)
            Line((-0.271316025, 1.656502339), (0, 0))
            ThreePointArc((0, 0), (0.709327194, 0.050570242), (1.418654389, 0))
        make_face()
    extrude(amount=5.896436275, mode=Mode.SUBTRACT)


solid = part.part
